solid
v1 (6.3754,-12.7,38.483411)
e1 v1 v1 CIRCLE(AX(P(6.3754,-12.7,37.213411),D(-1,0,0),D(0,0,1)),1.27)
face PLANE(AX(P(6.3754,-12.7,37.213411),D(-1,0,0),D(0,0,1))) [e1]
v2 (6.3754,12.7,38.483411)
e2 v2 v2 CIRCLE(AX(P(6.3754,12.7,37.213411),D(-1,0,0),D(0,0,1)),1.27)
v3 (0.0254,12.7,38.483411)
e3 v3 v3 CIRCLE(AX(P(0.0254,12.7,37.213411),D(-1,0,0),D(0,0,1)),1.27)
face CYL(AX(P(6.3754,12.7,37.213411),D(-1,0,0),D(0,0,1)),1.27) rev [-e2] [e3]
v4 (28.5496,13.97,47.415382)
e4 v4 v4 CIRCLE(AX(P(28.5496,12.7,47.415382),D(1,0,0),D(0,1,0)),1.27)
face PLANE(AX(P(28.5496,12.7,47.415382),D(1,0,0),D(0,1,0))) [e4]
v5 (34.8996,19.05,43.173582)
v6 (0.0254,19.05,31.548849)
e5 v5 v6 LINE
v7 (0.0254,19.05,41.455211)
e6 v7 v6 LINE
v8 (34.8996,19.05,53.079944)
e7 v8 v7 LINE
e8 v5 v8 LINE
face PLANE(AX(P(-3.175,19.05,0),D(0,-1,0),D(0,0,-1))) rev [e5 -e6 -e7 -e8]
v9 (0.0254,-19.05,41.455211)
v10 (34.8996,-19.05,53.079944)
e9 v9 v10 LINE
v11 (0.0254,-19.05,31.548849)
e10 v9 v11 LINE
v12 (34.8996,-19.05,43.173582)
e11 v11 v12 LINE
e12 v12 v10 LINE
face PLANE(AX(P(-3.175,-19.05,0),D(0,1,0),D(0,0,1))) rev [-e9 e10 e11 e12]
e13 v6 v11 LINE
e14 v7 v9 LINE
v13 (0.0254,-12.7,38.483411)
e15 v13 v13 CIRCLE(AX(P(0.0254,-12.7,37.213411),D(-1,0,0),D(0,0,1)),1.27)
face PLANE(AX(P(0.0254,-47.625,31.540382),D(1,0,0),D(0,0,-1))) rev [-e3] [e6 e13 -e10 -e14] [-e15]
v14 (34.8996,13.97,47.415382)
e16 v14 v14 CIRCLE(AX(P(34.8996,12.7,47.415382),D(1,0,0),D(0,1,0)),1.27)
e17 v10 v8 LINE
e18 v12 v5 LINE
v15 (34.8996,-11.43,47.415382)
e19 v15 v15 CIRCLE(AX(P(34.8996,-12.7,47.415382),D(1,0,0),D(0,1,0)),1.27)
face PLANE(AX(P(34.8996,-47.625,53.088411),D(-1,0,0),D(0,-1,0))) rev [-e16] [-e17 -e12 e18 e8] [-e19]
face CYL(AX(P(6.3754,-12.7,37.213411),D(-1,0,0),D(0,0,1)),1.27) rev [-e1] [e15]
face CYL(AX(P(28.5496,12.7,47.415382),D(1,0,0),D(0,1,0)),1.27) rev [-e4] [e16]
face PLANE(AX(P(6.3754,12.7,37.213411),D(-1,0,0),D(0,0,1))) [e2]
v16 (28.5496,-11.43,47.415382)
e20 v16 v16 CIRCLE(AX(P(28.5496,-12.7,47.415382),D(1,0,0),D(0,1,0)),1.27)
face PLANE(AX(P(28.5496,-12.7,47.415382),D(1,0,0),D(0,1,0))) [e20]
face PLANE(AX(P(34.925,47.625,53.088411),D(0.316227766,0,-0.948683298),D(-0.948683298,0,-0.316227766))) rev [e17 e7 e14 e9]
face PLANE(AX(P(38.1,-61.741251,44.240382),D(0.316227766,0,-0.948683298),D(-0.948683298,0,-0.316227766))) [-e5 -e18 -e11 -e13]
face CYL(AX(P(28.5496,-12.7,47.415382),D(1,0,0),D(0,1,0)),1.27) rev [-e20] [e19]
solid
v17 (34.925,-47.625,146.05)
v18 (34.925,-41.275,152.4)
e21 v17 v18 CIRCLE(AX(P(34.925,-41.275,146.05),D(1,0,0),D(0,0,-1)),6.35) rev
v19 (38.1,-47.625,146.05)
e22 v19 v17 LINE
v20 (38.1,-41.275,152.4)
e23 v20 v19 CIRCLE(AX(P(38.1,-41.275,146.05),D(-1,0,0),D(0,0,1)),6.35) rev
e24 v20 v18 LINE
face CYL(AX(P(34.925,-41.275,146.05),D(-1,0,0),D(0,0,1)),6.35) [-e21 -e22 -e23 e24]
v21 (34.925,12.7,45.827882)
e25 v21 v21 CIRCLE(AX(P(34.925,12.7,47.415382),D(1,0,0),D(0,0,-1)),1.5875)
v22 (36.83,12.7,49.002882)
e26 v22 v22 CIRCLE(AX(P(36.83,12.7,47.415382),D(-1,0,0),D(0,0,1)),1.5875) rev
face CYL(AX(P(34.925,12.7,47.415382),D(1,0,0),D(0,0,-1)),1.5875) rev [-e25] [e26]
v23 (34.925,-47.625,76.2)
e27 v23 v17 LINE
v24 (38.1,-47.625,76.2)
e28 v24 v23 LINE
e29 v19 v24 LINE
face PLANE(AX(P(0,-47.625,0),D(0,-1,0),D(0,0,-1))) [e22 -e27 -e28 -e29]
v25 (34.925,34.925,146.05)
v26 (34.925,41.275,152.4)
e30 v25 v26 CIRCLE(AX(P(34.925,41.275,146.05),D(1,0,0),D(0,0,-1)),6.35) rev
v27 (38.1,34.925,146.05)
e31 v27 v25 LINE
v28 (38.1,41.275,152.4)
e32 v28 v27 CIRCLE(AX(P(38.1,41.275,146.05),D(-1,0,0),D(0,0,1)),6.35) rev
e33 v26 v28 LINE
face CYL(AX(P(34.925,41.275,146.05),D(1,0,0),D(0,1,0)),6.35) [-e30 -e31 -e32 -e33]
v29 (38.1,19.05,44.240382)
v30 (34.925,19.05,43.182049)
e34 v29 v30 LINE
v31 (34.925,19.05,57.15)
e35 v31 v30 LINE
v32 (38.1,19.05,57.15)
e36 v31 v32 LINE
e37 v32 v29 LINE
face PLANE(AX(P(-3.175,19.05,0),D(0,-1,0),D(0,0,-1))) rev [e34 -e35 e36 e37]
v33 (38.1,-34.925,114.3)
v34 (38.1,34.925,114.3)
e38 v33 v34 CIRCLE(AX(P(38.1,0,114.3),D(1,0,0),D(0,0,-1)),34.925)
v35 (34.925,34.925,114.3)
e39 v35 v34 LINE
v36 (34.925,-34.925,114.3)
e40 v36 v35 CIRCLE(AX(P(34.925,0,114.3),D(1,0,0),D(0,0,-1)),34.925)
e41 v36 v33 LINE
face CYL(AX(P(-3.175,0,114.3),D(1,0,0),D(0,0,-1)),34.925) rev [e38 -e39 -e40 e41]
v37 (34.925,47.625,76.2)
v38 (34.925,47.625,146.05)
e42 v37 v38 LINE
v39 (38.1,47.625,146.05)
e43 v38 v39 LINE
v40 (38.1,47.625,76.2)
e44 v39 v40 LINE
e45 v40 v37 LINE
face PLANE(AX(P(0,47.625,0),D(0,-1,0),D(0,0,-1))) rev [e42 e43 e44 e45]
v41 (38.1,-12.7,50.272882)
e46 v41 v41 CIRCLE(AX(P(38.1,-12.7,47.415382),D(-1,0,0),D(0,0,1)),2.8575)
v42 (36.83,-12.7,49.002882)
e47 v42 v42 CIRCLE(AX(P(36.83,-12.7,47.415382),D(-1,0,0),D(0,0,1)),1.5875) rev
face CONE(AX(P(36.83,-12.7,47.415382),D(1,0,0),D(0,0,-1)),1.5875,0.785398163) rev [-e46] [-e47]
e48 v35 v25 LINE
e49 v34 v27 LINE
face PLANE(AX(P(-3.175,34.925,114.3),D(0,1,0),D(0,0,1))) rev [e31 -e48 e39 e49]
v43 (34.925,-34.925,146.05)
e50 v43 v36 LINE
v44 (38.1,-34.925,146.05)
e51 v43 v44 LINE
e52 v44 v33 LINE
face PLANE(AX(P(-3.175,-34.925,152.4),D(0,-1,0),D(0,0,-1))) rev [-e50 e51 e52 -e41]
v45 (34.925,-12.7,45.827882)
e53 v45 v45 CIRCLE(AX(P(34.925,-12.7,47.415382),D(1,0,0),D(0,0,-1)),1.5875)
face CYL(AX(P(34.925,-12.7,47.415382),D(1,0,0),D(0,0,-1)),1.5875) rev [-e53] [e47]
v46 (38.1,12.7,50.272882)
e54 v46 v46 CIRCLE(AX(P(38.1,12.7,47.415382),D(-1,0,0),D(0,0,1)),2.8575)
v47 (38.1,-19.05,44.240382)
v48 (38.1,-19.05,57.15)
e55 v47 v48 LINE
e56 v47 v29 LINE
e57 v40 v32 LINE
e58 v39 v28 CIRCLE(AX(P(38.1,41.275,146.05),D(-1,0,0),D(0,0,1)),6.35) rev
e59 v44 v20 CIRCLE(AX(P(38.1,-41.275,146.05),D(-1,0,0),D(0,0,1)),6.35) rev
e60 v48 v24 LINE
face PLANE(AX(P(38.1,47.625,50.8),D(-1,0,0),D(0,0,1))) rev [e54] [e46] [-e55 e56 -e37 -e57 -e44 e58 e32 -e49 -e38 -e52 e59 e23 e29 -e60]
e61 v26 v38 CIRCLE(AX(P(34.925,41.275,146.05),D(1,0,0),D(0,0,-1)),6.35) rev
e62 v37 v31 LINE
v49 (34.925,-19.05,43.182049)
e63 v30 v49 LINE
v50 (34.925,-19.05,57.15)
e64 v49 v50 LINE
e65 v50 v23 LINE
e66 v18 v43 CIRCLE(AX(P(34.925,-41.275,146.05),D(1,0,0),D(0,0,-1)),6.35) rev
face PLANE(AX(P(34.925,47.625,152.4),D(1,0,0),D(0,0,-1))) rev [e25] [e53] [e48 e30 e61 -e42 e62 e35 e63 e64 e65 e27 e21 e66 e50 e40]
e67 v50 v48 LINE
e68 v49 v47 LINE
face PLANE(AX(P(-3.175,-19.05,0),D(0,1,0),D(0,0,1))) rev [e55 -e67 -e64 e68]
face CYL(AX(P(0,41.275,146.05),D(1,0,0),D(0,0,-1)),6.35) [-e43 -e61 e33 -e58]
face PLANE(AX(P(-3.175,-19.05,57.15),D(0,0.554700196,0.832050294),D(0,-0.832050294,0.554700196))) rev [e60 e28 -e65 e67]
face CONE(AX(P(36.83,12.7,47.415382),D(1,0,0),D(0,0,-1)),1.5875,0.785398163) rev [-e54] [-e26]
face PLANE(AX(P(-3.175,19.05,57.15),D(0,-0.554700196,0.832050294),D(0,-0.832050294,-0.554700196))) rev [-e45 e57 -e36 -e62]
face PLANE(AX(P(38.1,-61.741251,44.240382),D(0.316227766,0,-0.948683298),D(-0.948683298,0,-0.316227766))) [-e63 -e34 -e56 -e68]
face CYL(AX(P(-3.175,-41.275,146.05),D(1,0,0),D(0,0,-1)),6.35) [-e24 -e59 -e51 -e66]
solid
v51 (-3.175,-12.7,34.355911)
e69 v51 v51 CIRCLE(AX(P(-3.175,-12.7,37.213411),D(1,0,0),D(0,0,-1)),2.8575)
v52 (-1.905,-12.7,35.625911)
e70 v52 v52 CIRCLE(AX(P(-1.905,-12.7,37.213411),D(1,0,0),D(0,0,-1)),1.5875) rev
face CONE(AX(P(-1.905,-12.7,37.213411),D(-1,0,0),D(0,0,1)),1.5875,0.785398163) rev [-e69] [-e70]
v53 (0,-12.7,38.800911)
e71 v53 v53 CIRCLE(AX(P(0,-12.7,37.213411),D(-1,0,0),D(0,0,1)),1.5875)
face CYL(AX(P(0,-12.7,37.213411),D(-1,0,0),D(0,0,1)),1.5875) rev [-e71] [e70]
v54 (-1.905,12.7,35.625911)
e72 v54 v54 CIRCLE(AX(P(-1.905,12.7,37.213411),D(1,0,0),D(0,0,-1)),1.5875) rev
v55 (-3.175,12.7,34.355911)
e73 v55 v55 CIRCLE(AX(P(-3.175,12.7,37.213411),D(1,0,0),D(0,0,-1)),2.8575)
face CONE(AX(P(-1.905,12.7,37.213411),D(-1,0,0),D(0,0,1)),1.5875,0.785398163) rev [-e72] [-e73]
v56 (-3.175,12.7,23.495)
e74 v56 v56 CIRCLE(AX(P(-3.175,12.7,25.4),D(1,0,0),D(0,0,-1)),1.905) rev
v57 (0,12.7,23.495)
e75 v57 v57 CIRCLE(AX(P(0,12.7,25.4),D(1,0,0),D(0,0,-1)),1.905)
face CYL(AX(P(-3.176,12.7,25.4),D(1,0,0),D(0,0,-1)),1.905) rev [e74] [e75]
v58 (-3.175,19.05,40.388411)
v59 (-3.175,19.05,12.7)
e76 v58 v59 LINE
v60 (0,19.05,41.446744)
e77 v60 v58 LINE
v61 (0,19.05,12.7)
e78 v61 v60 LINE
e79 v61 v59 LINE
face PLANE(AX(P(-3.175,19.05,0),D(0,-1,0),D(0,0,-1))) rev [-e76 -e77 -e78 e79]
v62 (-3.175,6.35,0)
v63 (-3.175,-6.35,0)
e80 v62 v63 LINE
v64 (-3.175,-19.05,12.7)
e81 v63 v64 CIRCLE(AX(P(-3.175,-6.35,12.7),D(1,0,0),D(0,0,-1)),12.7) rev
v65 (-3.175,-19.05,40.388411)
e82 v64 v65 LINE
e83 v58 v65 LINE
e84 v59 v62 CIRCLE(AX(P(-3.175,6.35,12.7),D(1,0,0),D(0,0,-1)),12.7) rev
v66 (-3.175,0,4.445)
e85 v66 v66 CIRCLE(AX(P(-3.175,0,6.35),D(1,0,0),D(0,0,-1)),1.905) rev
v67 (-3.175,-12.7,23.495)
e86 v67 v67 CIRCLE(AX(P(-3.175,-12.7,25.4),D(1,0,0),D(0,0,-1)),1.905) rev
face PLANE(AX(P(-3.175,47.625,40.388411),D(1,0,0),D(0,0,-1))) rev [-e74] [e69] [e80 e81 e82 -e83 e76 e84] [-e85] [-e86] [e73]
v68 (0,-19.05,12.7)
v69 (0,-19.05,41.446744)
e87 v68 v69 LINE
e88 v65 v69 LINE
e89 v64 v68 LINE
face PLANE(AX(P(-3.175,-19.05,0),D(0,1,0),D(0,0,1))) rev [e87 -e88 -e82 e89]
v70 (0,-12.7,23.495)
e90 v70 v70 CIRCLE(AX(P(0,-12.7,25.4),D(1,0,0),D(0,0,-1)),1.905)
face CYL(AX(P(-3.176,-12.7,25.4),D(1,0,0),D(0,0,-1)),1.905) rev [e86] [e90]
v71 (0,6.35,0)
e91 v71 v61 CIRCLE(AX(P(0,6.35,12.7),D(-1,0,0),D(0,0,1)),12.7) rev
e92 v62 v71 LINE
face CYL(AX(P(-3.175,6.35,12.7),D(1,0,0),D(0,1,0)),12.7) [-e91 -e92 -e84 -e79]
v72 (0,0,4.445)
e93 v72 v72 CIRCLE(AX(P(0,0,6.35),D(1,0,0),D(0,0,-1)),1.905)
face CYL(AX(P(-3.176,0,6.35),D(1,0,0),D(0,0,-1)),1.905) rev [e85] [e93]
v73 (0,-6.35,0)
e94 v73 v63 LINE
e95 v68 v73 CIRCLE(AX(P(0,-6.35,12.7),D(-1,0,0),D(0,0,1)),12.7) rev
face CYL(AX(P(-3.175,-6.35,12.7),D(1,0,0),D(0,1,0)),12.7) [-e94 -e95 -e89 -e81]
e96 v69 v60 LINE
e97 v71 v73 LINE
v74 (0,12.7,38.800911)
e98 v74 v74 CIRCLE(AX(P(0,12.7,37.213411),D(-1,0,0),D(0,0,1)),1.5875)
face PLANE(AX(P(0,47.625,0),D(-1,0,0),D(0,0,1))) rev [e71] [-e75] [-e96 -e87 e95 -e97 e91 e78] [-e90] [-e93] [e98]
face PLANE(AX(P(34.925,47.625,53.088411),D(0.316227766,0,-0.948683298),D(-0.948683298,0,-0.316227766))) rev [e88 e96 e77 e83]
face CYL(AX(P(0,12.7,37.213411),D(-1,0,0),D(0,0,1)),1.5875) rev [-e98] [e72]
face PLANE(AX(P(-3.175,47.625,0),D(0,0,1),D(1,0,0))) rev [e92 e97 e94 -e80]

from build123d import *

# Parameters (mm, degrees)
BOSS_EXTRUDE1_DEPTH = 47.625
CUT_EXTRUDE1_DEPTH  = 165.916725198
FILLET1_R           = 6.35
FILLET2_R           = 12.7
CUT_EXTRUDE2_REACH  = 166.151
SKETCH3_R           = 1.905
BOSS_EXTRUDE2_DEPTH = 38.1
SKETCH6_W           = 0.0254
SKETCH6_H           = 12.687385225
SKETCH6_H_2         = 17.118946269
CUT_EXTRUDE3_DEPTH  = 171.65440406
SKETCH7_R           = 1.5875
CUT_EXTRUDE4_DEPTH  = 3.175
SKETCH8_R           = 1.27
CUT_EXTRUDE5_DEPTH  = 6.35
SKETCH9_R           = 1.5875
CUT_EXTRUDE6_DEPTH  = 3.175
SKETCH10_R          = 1.27
CUT_EXTRUDE7_DEPTH  = 6.35
CHAMFER1_SIZE       = 1.27
CHAMFER2_SIZE       = 1.27


with BuildPart() as part:
    # Sketch1 → Boss-Extrude1 (new, symmetric)
    with BuildSketch(Plane(origin=(0, 0, 0), x_dir=(1, 0, 0), z_dir=(0, 1, 0))):
        Polygon((0, 0), (0, -38.1), (38.1, -50.8), (38.1, -152.4), (34.925, -152.4), (34.925, -53.088410524), (-3.175, -40.388410524), (-3.175, 0), align=None)
    extrude(amount=BOSS_EXTRUDE1_DEPTH, both=True)

    # Sketch2 → Cut-Extrude1 (cut, through all)
    with BuildSketch(Plane(origin=(38.1, 0, 0), x_dir=(0, 0, -1), z_dir=(1, 0, 0))):
        with BuildLine():
            Line((-114.3, 34.925), (-152.4, 34.925))
            Line((-152.4, 34.925), (-152.4, -34.925))
            Line((-152.4, -34.925), (-114.3, -34.925))
            ThreePointArc((-114.3, -34.925), (-79.375, 0), (-114.3, 34.925))
        make_face()
        Polygon((0, 19.05), (-57.15, 19.05), (-76.2, 47.625), (0, 47.625), align=None)
        Polygon((0, -47.625), (0, -19.05), (-57.15, -19.05), (-76.2, -47.625), align=None)
    extrude(amount=-CUT_EXTRUDE1_DEPTH, mode=Mode.SUBTRACT)

    # Fillet1
    fillet1_edges = [part.edges().sort_by_distance(p)[0] for p in [
        (36.5125, -47.625, 152.4),
        (36.5125, -34.925, 152.4),
        (36.5125, 47.625, 152.4),
        (36.5125, 34.925, 152.4),
    ]]
    fillet(fillet1_edges, radius=FILLET1_R - 0.0001)  # a hair under: the kernel refuses the full size

    # Fillet2
    fillet2_edges = [part.edges().sort_by_distance(p)[0] for p in [
        (-1.5875, 19.05, 0),
        (-1.5875, -19.05, 0),
    ]]
    fillet(fillet2_edges, radius=FILLET2_R)

    # Sketch3 → Cut-Extrude2 (cut, up to next)
    with BuildSketch(Plane(origin=(0, 0, 0), x_dir=(0, 0, -1), z_dir=(1, 0, 0)), mode=Mode.PRIVATE) as cut_extrude2_sk1:
        with Locations((-25.4, 12.7)):
            Circle(SKETCH3_R)
    cut_extrude2_tool1 = extrude(cut_extrude2_sk1.sketch, amount=-CUT_EXTRUDE2_REACH, mode=Mode.PRIVATE) & part.part
    # Sketch3 → Cut-Extrude2 (cut, up to next)
    with BuildSketch(Plane(origin=(0, 0, 0), x_dir=(0, 0, -1), z_dir=(1, 0, 0)), mode=Mode.PRIVATE) as cut_extrude2_sk2:
        with Locations((-6.35, 0)):
            Circle(SKETCH3_R)
    cut_extrude2_tool2 = extrude(cut_extrude2_sk2.sketch, amount=-CUT_EXTRUDE2_REACH, mode=Mode.PRIVATE) & part.part
    # Sketch3 → Cut-Extrude2 (cut, up to next)
    with BuildSketch(Plane(origin=(0, 0, 0), x_dir=(0, 0, -1), z_dir=(1, 0, 0)), mode=Mode.PRIVATE) as cut_extrude2_sk3:
        with Locations((-25.4, -12.7)):
            Circle(SKETCH3_R)
    cut_extrude2_tool3 = extrude(cut_extrude2_sk3.sketch, amount=-CUT_EXTRUDE2_REACH, mode=Mode.PRIVATE) & part.part
    add(cut_extrude2_tool1.solids().sort_by_distance((0, 12.7, 25.4))[0], mode=Mode.SUBTRACT)
    add(cut_extrude2_tool2.solids().sort_by_distance((0, 0, 6.35))[0], mode=Mode.SUBTRACT)
    add(cut_extrude2_tool3.solids().sort_by_distance((0, -12.7, 25.4))[0], mode=Mode.SUBTRACT)

    # Sketch5 → Boss-Extrude2 (add)
    with BuildSketch(Plane(origin=(0, 19.05, 0), x_dir=(1, 0, 0), z_dir=(0, 1, 0))):
        Polygon((38.1, -50.8), (38.1, -44.24038204), (0, -31.54038204), (0, -38.1), align=None)
    extrude(amount=-BOSS_EXTRUDE2_DEPTH)

    # Sketch6 → Cut-Extrude3 (cut, through all)
    with BuildSketch(Plane(origin=(0, 19.05, 0), x_dir=(1, 0, 0), z_dir=(0, 1, 0))):
        with Locations((34.9123, -46.744717912)):
            Rectangle(SKETCH6_W, SKETCH6_H)
        with Locations((0.0127, -40.099855175)):
            Rectangle(SKETCH6_W, SKETCH6_H_2)
    extrude(amount=-CUT_EXTRUDE3_DEPTH, mode=Mode.SUBTRACT)


with BuildPart() as cut_extrude3_piece_1:
    # of the separate pieces the step leaves, piece 1, a body of its own (cut_extrude3_pieces)
    add(part.part.solids().sort_by_distance((38.1, 19.05, 44.24038204))[0])

    # Sketch7 → Cut-Extrude4 (cut)
    with BuildSketch(Plane(origin=(38.1, 0, 0), x_dir=(0, 0, -1), z_dir=(1, 0, 0))):
        with Locations((-47.41538204, 12.7)):
            Circle(SKETCH7_R)
        with Locations((-47.41538204, -12.7)):
            Circle(SKETCH7_R)
    extrude(amount=-CUT_EXTRUDE4_DEPTH, mode=Mode.SUBTRACT)

    # Chamfer1
    chamfer1_edges = [cut_extrude3_piece_1.edges().sort_by_distance(p)[0] for p in [
        (38.1, 12.7, 49.00288204),
        (38.1, -12.7, 49.00288204),
    ]]
    chamfer(chamfer1_edges, length=CHAMFER1_SIZE)


with BuildPart() as cut_extrude3_piece_2:
    # of the separate pieces the step leaves, piece 2, a body of its own (cut_extrude3_pieces)
    add(part.part.solids().sort_by_distance((34.8996, 19.05, 43.17358204))[0])

    # Sketch8 → Cut-Extrude5 (cut)
    with BuildSketch(Plane(origin=(34.8996, 0, 0), x_dir=(0, 0, -1), z_dir=(1, 0, 0))):
        with Locations(Location((-47.41538204, 12.7, 0), (0, 0, 90))):
            Circle(SKETCH8_R)
        with Locations(Location((-47.41538204, -12.7, 0), (0, 0, 90))):
            Circle(SKETCH8_R)
    extrude(amount=-CUT_EXTRUDE5_DEPTH, mode=Mode.SUBTRACT)

    # Sketch10 → Cut-Extrude7 (cut)
    with BuildSketch(Plane.ZY.offset(-0.0254)):
        with Locations((37.213410524, 12.7)):
            Circle(SKETCH10_R)
        with Locations((37.213410524, -12.7)):
            Circle(SKETCH10_R)
    extrude(amount=-CUT_EXTRUDE7_DEPTH, mode=Mode.SUBTRACT)


with BuildPart() as cut_extrude3_piece_3:
    # of the separate pieces the step leaves, piece 3, a body of its own (cut_extrude3_pieces)
    add(part.part.solids().sort_by_distance((0, 19.05, 41.446743857))[0])

    # Sketch9 → Cut-Extrude6 (cut)
    with BuildSketch(Plane.ZY.offset(3.175)):
        with Locations((37.213410524, 12.7)):
            Circle(SKETCH9_R)
        with Locations((37.213410524, -12.7)):
            Circle(SKETCH9_R)
    extrude(amount=-CUT_EXTRUDE6_DEPTH, mode=Mode.SUBTRACT)

    # Chamfer2
    chamfer2_edges = [cut_extrude3_piece_3.edges().sort_by_distance(p)[0] for p in [
        (-3.175, 12.7, 35.625910524),
        (-3.175, -12.7, 35.625910524),
    ]]
    chamfer(chamfer2_edges, length=CHAMFER2_SIZE)


solid = Compound([cut_extrude3_piece_1.part, cut_extrude3_piece_2.part, cut_extrude3_piece_3.part])
